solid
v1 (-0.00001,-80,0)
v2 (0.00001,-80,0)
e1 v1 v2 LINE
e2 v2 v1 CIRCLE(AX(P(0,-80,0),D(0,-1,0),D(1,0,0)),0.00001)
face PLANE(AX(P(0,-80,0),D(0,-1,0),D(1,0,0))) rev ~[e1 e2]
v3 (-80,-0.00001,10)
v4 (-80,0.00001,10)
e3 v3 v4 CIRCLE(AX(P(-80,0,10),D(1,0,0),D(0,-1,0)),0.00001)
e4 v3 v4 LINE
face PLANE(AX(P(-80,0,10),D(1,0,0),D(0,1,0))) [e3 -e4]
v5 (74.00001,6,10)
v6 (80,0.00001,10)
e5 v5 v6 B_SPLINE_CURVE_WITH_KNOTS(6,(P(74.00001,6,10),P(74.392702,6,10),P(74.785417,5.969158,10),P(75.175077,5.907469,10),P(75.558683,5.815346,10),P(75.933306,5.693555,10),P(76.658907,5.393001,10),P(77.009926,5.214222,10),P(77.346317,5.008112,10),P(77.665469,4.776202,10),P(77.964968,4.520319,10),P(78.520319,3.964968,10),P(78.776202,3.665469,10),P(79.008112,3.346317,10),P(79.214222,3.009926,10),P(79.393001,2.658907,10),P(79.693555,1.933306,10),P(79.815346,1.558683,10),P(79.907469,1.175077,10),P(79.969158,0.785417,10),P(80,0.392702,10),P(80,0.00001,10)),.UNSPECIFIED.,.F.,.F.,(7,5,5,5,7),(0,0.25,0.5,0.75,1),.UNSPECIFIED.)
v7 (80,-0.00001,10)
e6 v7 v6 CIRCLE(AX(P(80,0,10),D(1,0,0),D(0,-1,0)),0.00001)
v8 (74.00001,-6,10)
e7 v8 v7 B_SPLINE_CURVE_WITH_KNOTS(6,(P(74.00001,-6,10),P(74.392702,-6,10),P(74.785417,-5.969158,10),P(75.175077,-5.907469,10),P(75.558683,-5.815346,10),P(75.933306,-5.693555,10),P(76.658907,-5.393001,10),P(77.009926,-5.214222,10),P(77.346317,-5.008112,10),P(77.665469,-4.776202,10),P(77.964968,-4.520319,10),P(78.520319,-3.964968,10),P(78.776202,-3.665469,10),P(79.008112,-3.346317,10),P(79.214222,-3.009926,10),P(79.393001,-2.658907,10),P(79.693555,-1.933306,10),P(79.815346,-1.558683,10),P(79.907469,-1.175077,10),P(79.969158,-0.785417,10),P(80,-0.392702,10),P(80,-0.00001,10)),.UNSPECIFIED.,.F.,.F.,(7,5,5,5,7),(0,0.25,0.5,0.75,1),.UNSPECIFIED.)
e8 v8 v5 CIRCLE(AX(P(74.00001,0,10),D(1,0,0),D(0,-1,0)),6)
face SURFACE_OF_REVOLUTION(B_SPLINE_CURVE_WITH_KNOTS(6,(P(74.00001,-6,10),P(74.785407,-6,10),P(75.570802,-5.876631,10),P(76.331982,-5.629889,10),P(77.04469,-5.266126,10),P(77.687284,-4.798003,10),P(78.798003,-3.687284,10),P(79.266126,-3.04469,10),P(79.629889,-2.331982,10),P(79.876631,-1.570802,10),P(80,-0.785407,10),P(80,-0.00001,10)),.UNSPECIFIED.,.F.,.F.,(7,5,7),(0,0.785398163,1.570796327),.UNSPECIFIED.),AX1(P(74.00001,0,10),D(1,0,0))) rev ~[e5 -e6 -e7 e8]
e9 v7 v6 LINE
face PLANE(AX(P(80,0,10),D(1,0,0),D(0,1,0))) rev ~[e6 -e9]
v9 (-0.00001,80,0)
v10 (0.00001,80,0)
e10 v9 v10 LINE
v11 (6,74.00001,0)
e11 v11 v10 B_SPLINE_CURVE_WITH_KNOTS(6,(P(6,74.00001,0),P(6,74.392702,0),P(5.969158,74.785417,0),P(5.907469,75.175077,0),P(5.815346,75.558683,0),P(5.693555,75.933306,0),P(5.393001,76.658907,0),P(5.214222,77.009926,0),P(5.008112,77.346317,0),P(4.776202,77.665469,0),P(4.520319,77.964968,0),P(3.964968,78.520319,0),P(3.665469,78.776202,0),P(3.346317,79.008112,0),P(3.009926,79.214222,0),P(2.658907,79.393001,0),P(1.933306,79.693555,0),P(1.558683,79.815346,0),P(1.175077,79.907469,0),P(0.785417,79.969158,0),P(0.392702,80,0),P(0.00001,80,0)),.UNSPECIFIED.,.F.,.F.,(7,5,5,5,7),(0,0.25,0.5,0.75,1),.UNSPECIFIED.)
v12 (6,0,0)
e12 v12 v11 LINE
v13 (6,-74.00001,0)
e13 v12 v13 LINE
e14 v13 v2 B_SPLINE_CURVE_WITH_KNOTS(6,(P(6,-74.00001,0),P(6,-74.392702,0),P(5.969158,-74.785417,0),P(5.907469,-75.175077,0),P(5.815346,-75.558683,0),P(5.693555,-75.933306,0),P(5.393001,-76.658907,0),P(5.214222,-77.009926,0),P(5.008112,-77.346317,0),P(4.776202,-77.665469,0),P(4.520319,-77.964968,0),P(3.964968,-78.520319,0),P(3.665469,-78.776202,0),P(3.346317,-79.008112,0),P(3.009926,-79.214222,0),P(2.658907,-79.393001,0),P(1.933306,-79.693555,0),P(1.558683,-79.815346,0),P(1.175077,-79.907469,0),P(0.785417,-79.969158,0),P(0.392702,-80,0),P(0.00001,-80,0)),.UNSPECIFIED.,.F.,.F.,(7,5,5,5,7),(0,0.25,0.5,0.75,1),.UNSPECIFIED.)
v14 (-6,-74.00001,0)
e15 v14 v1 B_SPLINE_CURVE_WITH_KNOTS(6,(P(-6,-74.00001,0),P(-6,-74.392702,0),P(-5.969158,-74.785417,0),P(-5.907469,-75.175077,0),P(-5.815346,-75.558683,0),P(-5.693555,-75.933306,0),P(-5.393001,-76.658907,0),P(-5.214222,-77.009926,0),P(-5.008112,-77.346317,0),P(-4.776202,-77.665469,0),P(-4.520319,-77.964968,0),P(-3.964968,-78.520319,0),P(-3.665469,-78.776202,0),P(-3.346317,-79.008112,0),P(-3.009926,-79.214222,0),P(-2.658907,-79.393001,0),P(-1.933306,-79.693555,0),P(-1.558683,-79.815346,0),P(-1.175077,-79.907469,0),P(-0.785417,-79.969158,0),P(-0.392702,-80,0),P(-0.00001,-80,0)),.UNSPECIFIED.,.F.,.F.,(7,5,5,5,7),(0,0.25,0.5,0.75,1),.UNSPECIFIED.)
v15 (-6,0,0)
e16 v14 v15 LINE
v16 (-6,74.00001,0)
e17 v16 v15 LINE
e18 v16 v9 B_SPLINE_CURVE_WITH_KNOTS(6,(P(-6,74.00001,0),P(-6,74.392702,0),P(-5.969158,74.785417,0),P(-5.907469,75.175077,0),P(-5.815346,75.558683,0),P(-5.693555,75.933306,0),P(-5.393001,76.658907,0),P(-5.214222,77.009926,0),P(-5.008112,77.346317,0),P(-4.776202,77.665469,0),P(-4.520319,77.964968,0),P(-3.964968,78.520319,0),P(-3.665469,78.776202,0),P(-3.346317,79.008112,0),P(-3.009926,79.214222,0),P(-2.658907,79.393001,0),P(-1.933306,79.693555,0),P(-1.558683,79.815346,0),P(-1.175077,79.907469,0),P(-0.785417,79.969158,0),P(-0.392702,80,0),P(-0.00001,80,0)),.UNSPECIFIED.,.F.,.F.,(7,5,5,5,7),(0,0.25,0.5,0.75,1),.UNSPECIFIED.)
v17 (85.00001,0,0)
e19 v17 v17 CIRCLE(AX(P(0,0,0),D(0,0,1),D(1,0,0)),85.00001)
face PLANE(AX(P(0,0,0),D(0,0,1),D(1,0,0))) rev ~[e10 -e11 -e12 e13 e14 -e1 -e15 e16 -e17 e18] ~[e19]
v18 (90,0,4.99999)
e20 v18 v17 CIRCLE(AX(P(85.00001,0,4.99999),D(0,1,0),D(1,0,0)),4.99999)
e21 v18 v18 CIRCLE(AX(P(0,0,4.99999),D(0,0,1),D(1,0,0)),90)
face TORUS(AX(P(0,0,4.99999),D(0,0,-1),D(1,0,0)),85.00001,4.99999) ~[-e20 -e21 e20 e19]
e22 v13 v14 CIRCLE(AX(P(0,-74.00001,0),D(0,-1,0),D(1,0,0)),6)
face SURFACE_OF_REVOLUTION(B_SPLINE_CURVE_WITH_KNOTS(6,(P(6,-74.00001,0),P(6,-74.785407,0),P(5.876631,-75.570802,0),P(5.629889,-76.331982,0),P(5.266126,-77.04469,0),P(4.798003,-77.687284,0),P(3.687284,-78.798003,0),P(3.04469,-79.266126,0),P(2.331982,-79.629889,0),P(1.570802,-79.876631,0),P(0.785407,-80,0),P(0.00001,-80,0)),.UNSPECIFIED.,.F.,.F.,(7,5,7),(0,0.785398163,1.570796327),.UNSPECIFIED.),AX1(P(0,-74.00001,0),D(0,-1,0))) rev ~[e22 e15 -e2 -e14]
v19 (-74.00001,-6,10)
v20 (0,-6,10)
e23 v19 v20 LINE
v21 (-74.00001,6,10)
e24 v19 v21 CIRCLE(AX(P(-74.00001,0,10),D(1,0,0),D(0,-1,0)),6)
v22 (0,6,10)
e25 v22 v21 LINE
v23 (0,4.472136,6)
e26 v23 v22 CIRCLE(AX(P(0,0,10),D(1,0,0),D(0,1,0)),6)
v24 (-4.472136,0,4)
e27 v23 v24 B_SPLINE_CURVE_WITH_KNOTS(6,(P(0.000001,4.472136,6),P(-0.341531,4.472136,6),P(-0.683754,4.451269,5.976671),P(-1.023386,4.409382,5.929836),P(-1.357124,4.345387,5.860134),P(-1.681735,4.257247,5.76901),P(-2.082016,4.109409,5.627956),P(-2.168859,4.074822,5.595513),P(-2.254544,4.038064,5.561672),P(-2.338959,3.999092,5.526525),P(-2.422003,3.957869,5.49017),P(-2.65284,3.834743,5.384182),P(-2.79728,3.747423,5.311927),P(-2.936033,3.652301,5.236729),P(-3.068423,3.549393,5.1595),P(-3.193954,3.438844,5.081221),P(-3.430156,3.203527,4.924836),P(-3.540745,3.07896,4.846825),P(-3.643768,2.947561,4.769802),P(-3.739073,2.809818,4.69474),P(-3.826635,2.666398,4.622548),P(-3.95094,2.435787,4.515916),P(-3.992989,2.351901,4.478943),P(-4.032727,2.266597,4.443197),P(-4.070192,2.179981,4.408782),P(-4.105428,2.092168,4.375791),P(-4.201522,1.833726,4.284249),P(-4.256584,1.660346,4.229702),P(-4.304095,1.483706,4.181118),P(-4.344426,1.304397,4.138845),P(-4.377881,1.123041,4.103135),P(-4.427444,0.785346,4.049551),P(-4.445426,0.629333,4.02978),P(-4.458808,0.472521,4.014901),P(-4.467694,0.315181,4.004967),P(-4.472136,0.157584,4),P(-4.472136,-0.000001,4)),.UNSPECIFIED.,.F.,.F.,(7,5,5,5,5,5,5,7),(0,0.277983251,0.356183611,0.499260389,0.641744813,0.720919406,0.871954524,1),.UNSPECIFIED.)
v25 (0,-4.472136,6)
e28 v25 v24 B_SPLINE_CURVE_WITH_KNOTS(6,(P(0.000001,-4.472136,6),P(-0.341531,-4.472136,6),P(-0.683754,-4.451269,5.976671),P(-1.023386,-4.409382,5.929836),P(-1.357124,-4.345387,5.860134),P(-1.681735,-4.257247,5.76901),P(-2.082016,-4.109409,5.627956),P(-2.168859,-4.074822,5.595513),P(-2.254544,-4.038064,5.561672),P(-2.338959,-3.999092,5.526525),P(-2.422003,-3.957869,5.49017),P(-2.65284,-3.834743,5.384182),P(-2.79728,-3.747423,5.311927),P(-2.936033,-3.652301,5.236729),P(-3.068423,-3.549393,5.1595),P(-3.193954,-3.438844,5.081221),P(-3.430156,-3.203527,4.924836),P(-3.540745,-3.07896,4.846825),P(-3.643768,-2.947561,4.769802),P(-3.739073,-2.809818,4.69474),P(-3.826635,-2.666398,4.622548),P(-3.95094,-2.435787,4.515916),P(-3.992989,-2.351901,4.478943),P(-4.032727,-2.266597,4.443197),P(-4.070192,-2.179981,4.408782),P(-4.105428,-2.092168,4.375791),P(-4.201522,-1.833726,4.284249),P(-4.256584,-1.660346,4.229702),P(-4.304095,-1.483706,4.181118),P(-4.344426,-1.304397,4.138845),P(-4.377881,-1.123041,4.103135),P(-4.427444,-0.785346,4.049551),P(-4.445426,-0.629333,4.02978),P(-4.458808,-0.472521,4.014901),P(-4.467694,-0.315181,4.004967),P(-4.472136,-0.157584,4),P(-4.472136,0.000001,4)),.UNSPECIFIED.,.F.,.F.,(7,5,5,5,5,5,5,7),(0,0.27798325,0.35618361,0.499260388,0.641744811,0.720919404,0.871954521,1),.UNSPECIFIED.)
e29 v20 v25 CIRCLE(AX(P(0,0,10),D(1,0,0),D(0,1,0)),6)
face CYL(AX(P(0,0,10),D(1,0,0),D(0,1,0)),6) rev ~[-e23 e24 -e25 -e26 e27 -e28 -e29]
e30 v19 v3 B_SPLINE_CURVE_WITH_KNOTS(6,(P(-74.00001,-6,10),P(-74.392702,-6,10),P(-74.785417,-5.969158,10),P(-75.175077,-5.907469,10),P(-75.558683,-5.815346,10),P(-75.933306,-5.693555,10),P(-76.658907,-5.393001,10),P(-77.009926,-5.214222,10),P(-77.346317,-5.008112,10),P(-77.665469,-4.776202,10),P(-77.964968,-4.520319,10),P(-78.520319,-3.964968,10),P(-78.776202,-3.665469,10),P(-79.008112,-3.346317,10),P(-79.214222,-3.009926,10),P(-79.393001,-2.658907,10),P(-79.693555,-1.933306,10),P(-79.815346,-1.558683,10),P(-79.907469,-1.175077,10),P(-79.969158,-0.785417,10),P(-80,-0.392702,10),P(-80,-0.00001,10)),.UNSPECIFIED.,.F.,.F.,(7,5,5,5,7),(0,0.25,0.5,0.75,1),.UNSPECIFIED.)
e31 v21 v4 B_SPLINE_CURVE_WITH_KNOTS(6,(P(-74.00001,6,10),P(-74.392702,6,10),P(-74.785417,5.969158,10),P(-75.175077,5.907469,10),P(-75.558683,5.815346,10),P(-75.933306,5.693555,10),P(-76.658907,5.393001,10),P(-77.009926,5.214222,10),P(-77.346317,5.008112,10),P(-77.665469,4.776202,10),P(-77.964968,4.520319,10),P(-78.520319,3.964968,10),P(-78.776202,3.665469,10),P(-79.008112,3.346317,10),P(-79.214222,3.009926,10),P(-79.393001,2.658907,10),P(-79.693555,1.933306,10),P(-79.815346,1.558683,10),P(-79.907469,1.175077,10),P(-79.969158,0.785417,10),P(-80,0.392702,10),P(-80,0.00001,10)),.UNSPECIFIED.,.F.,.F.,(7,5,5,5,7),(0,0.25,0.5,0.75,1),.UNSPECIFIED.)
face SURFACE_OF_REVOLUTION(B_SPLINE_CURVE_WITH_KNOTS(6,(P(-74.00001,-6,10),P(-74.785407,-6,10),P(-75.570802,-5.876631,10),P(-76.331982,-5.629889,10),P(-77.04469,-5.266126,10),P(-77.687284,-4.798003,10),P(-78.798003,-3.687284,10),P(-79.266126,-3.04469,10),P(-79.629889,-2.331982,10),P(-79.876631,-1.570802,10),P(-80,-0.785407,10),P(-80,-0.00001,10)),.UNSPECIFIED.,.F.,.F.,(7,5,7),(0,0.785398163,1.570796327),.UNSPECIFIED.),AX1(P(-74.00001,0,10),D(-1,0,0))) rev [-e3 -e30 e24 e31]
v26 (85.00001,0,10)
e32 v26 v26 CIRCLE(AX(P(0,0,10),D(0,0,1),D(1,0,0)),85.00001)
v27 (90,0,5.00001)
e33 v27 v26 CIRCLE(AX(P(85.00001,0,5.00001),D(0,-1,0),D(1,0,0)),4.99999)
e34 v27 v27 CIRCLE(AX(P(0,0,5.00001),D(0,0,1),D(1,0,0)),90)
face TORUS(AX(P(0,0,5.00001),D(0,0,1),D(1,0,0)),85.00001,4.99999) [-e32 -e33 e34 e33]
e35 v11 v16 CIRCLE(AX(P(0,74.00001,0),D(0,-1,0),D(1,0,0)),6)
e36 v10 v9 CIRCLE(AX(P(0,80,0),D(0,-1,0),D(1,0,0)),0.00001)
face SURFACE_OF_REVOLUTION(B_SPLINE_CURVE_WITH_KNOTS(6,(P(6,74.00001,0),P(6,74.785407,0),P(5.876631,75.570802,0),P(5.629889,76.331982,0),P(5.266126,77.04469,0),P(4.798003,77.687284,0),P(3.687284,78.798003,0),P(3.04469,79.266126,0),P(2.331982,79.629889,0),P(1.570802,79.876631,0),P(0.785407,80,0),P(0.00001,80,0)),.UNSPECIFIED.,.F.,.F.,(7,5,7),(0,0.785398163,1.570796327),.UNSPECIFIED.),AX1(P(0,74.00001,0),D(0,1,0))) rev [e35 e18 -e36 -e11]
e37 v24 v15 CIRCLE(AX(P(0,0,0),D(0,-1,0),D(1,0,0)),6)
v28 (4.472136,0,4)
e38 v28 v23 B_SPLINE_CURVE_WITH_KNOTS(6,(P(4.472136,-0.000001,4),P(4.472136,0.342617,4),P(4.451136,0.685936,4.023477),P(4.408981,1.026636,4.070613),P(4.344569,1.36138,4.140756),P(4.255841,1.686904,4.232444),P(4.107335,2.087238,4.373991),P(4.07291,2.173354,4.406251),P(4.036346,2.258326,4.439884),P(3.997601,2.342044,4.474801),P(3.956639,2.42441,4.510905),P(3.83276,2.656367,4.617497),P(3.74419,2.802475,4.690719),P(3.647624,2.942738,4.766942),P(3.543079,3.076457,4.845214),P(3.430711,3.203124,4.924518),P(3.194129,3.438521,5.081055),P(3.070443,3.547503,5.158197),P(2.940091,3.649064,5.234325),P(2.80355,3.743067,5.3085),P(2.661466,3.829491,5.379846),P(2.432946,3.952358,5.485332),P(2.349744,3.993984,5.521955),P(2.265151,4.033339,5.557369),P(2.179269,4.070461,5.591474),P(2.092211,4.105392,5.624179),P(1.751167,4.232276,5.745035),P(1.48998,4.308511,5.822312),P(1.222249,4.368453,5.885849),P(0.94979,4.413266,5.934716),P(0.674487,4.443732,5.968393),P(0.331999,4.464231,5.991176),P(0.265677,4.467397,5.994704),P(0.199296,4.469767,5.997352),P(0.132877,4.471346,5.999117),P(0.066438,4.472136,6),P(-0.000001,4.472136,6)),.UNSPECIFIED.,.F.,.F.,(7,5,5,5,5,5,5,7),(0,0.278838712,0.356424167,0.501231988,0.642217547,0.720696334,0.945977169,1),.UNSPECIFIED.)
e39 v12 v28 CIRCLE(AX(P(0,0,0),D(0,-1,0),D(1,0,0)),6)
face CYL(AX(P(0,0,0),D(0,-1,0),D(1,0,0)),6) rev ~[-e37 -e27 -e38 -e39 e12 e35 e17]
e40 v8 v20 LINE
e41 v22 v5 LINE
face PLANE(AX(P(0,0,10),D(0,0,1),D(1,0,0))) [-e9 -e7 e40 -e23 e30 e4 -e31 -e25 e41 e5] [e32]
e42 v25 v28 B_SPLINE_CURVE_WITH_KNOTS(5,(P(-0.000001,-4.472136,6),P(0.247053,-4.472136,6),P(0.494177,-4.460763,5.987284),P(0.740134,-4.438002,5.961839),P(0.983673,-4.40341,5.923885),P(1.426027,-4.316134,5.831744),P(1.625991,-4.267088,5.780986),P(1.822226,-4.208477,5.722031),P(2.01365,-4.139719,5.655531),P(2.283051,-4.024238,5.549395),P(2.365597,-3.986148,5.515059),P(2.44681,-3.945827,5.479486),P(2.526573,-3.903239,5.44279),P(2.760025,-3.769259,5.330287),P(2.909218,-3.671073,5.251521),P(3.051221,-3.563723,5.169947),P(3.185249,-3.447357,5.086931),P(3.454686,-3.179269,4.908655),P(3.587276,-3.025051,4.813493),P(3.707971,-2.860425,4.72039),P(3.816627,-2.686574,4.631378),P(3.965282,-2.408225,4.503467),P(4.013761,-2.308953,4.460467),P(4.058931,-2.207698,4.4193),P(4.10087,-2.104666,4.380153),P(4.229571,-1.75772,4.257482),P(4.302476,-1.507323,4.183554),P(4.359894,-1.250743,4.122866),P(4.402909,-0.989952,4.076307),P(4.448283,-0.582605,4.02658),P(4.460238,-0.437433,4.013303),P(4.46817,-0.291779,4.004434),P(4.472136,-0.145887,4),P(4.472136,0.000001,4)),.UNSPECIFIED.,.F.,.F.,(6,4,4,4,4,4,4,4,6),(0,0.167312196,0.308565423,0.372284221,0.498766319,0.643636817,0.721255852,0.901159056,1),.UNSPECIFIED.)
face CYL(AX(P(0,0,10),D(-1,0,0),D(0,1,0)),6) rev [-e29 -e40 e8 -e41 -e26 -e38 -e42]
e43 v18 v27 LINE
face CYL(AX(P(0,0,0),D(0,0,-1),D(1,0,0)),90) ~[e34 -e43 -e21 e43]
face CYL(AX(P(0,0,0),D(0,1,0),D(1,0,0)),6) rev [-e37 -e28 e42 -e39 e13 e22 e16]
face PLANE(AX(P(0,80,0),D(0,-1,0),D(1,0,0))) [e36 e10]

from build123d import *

# Parameters (mm, degrees)
F0_R          = 90
F1_DEPTH      = 10
F2_R          = 4.99999
F3_R          = 6
F4_DEPTH      = 80
F4_DEPTH_BACK = 80
F5_R          = 6
F6_DEPTH      = 80
F6_DEPTH_BACK = 80
F7_R          = 5.99999
F8_R          = 5.99999


# Not quite as in the source:
# - a fillet or chamfer is up to 0.001 mm smaller than in the source, because OpenCascade refuses the exact size


with BuildPart() as f1:
    # F0 (on Top) → F1 (new body)
    with BuildSketch(Plane.XY):
        Circle(F0_R)
    extrude(amount=F1_DEPTH)

    # F2 (radius 5 in the source; OpenCascade refuses exactly that, so slightly less here)
    f2_edges = [f1.edges().sort_by_distance(p)[0] for p in [
        (-90, 0, 10),
        (-90, 0, 0),
    ]]
    fillet(f2_edges, radius=F2_R)

    # F3 (on Front) → F4 (cut, two sides)
    with BuildSketch(Plane.XZ) as f4_sk:
        Circle(F3_R)
    extrude(amount=F4_DEPTH, mode=Mode.SUBTRACT)
    extrude(f4_sk.sketch, amount=-F4_DEPTH_BACK, mode=Mode.SUBTRACT)

    # F5 (on Right) → F6 (cut, two sides)
    with BuildSketch(Plane.YZ) as f6_sk:
        with Locations((0, 10)):
            Circle(F5_R)
    extrude(amount=-F6_DEPTH, mode=Mode.SUBTRACT)
    extrude(f6_sk.sketch, amount=F6_DEPTH_BACK, mode=Mode.SUBTRACT)

    # F7 (radius 6 in the source; OpenCascade refuses exactly that, so slightly less here)
    f7_edges = [f1.edges().sort_by_distance(p)[0] for p in [
        (80, 0, 4),
        (-80, 0, 4),
    ]]
    fillet(f7_edges, radius=F7_R)

    # F8 (radius 6 in the source; OpenCascade refuses exactly that, so slightly less here)
    f8_edges = [f1.edges().sort_by_distance(p)[0] for p in [
        (0, -80, 6),
        (0, 80, 6),
    ]]
    fillet(f8_edges, radius=F8_R)


solid = f1.part
